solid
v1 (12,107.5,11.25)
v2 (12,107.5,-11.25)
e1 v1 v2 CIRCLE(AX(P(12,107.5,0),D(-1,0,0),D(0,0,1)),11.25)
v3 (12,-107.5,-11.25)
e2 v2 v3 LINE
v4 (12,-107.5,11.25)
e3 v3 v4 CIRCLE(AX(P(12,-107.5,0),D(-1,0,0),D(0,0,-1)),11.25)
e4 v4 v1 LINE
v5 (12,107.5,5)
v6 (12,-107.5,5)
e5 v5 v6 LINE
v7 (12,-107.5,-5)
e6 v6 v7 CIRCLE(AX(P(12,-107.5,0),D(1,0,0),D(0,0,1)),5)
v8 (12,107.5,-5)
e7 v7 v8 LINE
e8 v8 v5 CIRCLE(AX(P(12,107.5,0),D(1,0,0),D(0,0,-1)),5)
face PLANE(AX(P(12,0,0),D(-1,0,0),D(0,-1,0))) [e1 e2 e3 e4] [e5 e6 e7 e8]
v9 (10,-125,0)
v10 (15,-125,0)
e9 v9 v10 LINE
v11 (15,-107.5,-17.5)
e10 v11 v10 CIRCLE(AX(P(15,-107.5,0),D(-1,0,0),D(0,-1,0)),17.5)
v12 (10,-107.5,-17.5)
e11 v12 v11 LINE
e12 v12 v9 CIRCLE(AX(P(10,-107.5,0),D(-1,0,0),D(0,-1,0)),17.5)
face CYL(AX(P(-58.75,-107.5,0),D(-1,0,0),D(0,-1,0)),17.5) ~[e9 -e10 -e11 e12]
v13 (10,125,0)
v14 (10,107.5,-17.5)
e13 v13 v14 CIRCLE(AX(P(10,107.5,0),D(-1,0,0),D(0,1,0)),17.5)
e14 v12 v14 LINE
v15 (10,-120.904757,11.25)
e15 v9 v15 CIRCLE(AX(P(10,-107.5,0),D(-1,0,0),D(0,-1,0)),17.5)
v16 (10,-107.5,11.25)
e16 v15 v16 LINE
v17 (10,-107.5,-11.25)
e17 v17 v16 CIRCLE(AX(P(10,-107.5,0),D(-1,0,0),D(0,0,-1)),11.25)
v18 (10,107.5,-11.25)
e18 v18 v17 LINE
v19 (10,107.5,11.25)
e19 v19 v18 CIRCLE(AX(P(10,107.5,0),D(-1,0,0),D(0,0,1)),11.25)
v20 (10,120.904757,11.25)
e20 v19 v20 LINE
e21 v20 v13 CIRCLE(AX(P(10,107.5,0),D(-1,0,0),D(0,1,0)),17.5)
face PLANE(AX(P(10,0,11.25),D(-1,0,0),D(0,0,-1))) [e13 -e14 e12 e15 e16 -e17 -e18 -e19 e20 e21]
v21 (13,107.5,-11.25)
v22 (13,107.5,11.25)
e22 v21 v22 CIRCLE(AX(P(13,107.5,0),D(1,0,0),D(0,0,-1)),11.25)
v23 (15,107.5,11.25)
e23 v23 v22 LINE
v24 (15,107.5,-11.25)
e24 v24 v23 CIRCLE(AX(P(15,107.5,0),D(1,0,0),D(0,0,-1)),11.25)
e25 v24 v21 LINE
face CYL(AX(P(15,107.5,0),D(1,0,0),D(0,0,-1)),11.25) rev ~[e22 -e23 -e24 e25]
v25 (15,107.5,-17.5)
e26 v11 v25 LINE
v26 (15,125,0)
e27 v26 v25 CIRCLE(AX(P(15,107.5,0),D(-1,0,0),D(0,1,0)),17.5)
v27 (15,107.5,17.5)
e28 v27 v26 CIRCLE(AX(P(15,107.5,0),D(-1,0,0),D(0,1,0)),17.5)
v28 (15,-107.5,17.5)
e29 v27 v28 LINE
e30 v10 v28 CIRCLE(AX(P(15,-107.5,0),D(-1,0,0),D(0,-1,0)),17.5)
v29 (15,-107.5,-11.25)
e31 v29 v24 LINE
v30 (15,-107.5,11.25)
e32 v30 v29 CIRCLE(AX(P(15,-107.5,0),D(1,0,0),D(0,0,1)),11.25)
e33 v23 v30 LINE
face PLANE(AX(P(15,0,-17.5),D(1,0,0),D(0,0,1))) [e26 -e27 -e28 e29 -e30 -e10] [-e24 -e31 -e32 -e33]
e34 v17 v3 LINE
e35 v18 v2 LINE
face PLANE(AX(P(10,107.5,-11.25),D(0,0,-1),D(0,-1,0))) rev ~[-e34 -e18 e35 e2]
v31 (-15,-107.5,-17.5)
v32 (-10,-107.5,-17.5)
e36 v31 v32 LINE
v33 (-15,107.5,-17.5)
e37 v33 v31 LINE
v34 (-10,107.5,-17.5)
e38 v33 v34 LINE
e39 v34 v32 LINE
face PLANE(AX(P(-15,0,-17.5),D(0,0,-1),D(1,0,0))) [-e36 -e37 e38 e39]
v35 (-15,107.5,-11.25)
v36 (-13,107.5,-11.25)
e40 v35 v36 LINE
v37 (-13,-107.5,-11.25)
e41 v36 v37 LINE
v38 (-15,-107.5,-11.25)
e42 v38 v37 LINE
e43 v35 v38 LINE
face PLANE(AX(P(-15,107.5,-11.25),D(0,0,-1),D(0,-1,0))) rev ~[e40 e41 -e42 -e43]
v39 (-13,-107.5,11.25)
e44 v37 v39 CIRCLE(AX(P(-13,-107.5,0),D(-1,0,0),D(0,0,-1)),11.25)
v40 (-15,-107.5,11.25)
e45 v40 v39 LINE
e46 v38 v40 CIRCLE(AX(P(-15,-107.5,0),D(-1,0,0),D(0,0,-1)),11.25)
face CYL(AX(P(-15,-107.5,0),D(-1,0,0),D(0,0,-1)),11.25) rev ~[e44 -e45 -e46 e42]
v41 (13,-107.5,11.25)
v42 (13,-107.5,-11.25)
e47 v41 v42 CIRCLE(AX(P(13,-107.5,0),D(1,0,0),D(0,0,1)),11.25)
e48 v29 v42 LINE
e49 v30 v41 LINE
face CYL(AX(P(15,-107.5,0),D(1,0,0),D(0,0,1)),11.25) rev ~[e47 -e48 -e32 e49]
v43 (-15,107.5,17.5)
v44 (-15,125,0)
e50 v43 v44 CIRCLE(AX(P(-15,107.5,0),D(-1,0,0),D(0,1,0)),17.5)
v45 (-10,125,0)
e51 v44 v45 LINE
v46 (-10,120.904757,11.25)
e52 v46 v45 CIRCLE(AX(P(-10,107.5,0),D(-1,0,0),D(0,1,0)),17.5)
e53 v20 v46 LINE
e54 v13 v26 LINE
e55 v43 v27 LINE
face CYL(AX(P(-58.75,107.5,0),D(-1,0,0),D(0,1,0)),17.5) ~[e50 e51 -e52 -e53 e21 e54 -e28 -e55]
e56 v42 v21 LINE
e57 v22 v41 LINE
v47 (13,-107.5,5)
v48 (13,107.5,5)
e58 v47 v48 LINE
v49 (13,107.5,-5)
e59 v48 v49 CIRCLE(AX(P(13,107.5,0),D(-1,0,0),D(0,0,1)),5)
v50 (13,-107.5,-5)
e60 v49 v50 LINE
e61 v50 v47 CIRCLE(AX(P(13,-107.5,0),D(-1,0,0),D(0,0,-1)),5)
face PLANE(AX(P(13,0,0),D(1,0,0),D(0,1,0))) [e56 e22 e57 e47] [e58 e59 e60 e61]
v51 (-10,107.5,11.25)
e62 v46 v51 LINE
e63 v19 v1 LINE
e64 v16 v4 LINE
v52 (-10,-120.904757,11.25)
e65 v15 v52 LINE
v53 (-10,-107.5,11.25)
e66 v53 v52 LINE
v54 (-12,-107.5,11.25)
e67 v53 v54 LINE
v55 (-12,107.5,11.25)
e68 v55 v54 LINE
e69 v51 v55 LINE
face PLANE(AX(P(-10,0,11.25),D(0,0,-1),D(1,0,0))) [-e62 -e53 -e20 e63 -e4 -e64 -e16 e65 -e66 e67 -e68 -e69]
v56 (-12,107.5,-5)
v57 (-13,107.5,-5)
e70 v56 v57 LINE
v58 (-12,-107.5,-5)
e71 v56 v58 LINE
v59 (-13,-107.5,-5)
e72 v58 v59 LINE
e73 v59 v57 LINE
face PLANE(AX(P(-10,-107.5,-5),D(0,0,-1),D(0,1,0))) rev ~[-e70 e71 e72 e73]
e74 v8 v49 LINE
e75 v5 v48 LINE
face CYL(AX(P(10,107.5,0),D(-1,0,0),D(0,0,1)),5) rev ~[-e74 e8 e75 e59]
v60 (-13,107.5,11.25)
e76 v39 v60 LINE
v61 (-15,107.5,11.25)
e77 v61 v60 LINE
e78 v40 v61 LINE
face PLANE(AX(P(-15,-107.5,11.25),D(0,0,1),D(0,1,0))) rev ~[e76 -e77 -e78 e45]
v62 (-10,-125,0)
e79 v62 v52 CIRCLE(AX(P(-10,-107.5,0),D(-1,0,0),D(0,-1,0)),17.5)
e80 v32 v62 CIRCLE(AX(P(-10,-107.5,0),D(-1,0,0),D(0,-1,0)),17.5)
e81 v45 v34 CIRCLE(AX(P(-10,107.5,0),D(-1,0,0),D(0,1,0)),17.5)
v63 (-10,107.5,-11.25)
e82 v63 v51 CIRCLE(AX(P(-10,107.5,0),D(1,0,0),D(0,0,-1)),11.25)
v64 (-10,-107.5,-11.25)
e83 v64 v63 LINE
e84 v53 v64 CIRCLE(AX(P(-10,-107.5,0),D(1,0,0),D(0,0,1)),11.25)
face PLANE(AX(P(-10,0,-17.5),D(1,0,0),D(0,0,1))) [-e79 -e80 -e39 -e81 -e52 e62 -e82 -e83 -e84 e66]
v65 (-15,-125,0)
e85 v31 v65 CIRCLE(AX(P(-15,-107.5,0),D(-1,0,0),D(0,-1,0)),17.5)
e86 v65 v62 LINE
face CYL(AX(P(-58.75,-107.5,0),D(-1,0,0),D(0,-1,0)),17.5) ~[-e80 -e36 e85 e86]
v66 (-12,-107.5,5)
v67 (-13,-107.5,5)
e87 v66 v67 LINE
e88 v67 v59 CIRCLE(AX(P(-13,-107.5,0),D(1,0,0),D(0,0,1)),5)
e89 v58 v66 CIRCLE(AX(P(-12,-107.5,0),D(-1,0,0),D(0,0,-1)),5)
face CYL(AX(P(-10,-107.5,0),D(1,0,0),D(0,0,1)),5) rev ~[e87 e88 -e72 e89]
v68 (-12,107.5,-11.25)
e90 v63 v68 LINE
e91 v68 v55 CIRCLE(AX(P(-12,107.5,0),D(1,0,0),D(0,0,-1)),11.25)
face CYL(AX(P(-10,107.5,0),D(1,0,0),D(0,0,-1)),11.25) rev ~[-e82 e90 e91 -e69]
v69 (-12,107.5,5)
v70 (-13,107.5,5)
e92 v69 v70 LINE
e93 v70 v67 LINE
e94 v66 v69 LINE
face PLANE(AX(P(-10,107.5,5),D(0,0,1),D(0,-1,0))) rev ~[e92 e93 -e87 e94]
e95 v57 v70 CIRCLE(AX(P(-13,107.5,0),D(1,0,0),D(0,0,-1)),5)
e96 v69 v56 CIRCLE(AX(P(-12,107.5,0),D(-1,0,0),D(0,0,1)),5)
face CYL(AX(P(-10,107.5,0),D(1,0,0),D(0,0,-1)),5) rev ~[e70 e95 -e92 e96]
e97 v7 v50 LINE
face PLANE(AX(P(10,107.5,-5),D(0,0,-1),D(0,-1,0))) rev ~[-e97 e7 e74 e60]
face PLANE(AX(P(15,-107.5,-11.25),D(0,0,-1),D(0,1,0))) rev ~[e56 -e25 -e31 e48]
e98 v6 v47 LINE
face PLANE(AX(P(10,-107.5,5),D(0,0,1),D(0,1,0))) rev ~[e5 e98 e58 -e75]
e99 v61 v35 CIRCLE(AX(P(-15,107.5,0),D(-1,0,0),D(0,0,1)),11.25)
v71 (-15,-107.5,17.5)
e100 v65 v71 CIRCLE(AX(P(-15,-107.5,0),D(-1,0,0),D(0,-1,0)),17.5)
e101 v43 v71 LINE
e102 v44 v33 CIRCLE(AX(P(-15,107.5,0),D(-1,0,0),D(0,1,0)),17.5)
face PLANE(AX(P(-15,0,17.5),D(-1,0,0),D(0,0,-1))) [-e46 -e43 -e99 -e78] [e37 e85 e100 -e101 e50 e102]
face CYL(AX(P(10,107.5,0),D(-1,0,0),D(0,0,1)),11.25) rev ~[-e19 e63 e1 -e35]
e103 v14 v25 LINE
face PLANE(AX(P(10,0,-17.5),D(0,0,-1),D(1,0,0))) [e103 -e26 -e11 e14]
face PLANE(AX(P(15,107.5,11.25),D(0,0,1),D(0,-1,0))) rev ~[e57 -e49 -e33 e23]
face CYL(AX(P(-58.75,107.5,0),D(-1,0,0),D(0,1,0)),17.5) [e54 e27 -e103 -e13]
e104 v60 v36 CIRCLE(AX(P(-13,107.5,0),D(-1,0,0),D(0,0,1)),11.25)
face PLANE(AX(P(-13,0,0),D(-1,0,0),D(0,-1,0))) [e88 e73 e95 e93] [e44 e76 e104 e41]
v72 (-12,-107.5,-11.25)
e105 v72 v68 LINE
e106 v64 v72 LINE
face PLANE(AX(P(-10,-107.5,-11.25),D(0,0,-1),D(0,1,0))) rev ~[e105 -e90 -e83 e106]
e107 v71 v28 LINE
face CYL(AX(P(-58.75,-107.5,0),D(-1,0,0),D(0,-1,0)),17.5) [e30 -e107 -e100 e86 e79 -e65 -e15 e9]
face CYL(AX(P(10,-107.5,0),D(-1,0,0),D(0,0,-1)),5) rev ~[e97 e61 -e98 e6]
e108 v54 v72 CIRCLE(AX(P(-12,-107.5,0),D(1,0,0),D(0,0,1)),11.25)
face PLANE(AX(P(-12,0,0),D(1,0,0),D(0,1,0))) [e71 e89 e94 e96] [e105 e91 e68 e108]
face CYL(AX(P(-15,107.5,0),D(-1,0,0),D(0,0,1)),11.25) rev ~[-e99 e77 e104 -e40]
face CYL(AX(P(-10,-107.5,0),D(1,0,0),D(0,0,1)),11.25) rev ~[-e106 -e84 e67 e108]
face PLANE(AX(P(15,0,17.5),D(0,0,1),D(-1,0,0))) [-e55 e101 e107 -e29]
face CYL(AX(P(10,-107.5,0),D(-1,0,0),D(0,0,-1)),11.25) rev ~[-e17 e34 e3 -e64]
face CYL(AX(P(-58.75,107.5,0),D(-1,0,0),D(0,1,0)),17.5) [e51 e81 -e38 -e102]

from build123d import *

# Parameters (mm, degrees)
F1_DEPTH      = 125
F1_DEPTH_BACK = 125
F6_DEPTH      = 5.001
F7_DEPTH      = 5.001
F8_DEPTH      = 2
F9_DEPTH      = 2
F10_DEPTH     = 2
F11_DEPTH     = 2
F12_T1_DEPTH  = 92.5
F12_T3_DEPTH  = 92.5
F12_T5_DEPTH  = 117.5


# Not quite as in the source:
# - a fillet or chamfer that OpenCascade refuses, or shapes differently, is made with other operations: its cross-section is extruded or revolved along the edge and cut away or added


with BuildPart() as f1:
    # F0 (on Front) → F1 (new body, two sides)
    with BuildSketch(Plane.XZ) as f1_sk:
        Polygon((15, -17.5), (15, 17.5), (-15, 17.5), (-15, -17.5), (-10, -17.5), (-10, 11.25), (10, 11.25), (10, -17.5), align=None)
    extrude(amount=F1_DEPTH)
    extrude(f1_sk.sketch, amount=-F1_DEPTH_BACK)

    # F2 (on face) → F6 (cut, through all)
    with BuildSketch(Plane(origin=(10, 0, 0), x_dir=(0, -1, 0), z_dir=(-1, 0, 0))):
        with BuildLine():
            Line((-107.5, -5), (107.5, -5))
            ThreePointArc((107.5, -5), (112.5, 0), (107.5, 5))
            Line((107.5, 5), (-107.5, 5))
            ThreePointArc((-107.5, 5), (-112.5, 0), (-107.5, -5))
        make_face()
    extrude(amount=-F6_DEPTH, mode=Mode.SUBTRACT)

    # F4 (on face) → F7 (cut, through all)
    with BuildSketch(Plane.YZ.offset(-10)):
        with BuildLine():
            Line((107.5, 5), (-107.5, 5))
            ThreePointArc((-107.5, 5), (-112.5, 0), (-107.5, -5))
            Line((-107.5, -5), (107.5, -5))
            ThreePointArc((107.5, -5), (112.5, 0), (107.5, 5))
        make_face()
    extrude(amount=-F7_DEPTH, mode=Mode.SUBTRACT)

    # F2 (on face) → F8 (cut)
    with BuildSketch(Plane(origin=(10, 0, 0), x_dir=(0, -1, 0), z_dir=(-1, 0, 0))):
        with BuildLine():
            Line((-107.5, -11.25), (107.5, -11.25))
            ThreePointArc((107.5, -11.25), (118.75, 0), (107.5, 11.25))
            Line((107.5, 11.25), (-107.5, 11.25))
            ThreePointArc((-107.5, 11.25), (-118.75, 0), (-107.5, -11.25))
        make_face()
        with BuildLine():
            ThreePointArc((107.5, 5), (112.5, 0), (107.5, -5))
            Line((107.5, -5), (-107.5, -5))
            ThreePointArc((-107.5, -5), (-112.5, 0), (-107.5, 5))
            Line((-107.5, 5), (107.5, 5))
        make_face(mode=Mode.SUBTRACT)
    extrude(amount=-F8_DEPTH, mode=Mode.SUBTRACT)

    # F3 (on face) → F9 (cut)
    with BuildSketch(Plane.YZ.offset(15)):
        with BuildLine():
            ThreePointArc((-107.5, 11.25), (-118.75, 0), (-107.5, -11.25))
            Line((-107.5, -11.25), (107.5, -11.25))
            ThreePointArc((107.5, -11.25), (118.75, 0), (107.5, 11.25))
            Line((107.5, 11.25), (-107.5, 11.25))
        make_face()
        with BuildLine():
            ThreePointArc((-107.5, -5), (-112.5, 0), (-107.5, 5))
            Line((-107.5, 5), (107.5, 5))
            ThreePointArc((107.5, 5), (112.5, 0), (107.5, -5))
            Line((107.5, -5), (-107.5, -5))
        make_face(mode=Mode.SUBTRACT)
    extrude(amount=-F9_DEPTH, mode=Mode.SUBTRACT)

    # F5 (on face) → F10 (cut)
    with BuildSketch(Plane(origin=(-15, 0, 0), x_dir=(0, -1, 0), z_dir=(-1, 0, 0))):
        with BuildLine():
            Line((107.5, 11.25), (-107.5, 11.25))
            ThreePointArc((-107.5, 11.25), (-118.75, 0), (-107.5, -11.25))
            Line((-107.5, -11.25), (107.5, -11.25))
            ThreePointArc((107.5, -11.25), (118.75, 0), (107.5, 11.25))
        make_face()
        with BuildLine():
            ThreePointArc((-107.5, -5), (-112.5, 0), (-107.5, 5))
            Line((-107.5, 5), (107.5, 5))
            ThreePointArc((107.5, 5), (112.5, 0), (107.5, -5))
            Line((107.5, -5), (-107.5, -5))
        make_face(mode=Mode.SUBTRACT)
    extrude(amount=-F10_DEPTH, mode=Mode.SUBTRACT)

    # F4 (on face) → F11 (cut)
    with BuildSketch(Plane.YZ.offset(-10)):
        with BuildLine():
            Line((107.5, 11.25), (-107.5, 11.25))
            ThreePointArc((-107.5, 11.25), (-118.75, 0), (-107.5, -11.25))
            Line((-107.5, -11.25), (107.5, -11.25))
            ThreePointArc((107.5, -11.25), (118.75, 0), (107.5, 11.25))
        make_face()
        with BuildLine():
            ThreePointArc((-107.5, -5), (-112.5, 0), (-107.5, 5))
            Line((-107.5, 5), (107.5, 5))
            ThreePointArc((107.5, 5), (112.5, 0), (107.5, -5))
            Line((107.5, -5), (-107.5, -5))
        make_face(mode=Mode.SUBTRACT)
    extrude(amount=-F11_DEPTH, mode=Mode.SUBTRACT)

    # F12: fillet of radius 17.5 on 6 edges, made by hand

    # F12_s2 → F12_t1 (cut)
    with BuildSketch(Plane.YZ.offset(-58.75)):
        with BuildLine():
            ThreePointArc((125, 0), (119.8743686708, -12.3743686708), (107.5, -17.5))
            Line((107.5, -17.5), (125, -17.5))
            Line((125, -17.5), (125, 0))
        make_face()
        with BuildLine():
            ThreePointArc((-125, 0), (-119.8743686708, -12.3743686708), (-107.5, -17.5))
            Line((-107.5, -17.5), (-125, -17.5))
            Line((-125, -17.5), (-125, 0))
        make_face()
    extrude(amount=F12_T1_DEPTH, mode=Mode.SUBTRACT)

    # F12_s4 → F12_t3 (cut)
    with BuildSketch(Plane.YZ.offset(-33.75)):
        with BuildLine():
            ThreePointArc((107.5, -17.5), (119.8743686708, -12.3743686708), (125, 0))
            Line((125, 0), (125, -17.5))
            Line((125, -17.5), (107.5, -17.5))
        make_face()
        with BuildLine():
            ThreePointArc((-107.5, -17.5), (-119.8743686708, -12.3743686708), (-125, 0))
            Line((-125, 0), (-125, -17.5))
            Line((-125, -17.5), (-107.5, -17.5))
        make_face()
    extrude(amount=F12_T3_DEPTH, mode=Mode.SUBTRACT)

    # F12_s6 → F12_t5 (cut)
    with BuildSketch(Plane.YZ.offset(-58.75)):
        with BuildLine():
            ThreePointArc((125, 0), (119.8743686708, 12.3743686708), (107.5, 17.5))
            Line((107.5, 17.5), (125, 17.5))
            Line((125, 17.5), (125, 0))
        make_face()
        with BuildLine():
            ThreePointArc((-125, 0), (-119.8743686708, 12.3743686708), (-107.5, 17.5))
            Line((-107.5, 17.5), (-125, 17.5))
            Line((-125, 17.5), (-125, 0))
        make_face()
    extrude(amount=F12_T5_DEPTH, mode=Mode.SUBTRACT)


solid = f1.part
